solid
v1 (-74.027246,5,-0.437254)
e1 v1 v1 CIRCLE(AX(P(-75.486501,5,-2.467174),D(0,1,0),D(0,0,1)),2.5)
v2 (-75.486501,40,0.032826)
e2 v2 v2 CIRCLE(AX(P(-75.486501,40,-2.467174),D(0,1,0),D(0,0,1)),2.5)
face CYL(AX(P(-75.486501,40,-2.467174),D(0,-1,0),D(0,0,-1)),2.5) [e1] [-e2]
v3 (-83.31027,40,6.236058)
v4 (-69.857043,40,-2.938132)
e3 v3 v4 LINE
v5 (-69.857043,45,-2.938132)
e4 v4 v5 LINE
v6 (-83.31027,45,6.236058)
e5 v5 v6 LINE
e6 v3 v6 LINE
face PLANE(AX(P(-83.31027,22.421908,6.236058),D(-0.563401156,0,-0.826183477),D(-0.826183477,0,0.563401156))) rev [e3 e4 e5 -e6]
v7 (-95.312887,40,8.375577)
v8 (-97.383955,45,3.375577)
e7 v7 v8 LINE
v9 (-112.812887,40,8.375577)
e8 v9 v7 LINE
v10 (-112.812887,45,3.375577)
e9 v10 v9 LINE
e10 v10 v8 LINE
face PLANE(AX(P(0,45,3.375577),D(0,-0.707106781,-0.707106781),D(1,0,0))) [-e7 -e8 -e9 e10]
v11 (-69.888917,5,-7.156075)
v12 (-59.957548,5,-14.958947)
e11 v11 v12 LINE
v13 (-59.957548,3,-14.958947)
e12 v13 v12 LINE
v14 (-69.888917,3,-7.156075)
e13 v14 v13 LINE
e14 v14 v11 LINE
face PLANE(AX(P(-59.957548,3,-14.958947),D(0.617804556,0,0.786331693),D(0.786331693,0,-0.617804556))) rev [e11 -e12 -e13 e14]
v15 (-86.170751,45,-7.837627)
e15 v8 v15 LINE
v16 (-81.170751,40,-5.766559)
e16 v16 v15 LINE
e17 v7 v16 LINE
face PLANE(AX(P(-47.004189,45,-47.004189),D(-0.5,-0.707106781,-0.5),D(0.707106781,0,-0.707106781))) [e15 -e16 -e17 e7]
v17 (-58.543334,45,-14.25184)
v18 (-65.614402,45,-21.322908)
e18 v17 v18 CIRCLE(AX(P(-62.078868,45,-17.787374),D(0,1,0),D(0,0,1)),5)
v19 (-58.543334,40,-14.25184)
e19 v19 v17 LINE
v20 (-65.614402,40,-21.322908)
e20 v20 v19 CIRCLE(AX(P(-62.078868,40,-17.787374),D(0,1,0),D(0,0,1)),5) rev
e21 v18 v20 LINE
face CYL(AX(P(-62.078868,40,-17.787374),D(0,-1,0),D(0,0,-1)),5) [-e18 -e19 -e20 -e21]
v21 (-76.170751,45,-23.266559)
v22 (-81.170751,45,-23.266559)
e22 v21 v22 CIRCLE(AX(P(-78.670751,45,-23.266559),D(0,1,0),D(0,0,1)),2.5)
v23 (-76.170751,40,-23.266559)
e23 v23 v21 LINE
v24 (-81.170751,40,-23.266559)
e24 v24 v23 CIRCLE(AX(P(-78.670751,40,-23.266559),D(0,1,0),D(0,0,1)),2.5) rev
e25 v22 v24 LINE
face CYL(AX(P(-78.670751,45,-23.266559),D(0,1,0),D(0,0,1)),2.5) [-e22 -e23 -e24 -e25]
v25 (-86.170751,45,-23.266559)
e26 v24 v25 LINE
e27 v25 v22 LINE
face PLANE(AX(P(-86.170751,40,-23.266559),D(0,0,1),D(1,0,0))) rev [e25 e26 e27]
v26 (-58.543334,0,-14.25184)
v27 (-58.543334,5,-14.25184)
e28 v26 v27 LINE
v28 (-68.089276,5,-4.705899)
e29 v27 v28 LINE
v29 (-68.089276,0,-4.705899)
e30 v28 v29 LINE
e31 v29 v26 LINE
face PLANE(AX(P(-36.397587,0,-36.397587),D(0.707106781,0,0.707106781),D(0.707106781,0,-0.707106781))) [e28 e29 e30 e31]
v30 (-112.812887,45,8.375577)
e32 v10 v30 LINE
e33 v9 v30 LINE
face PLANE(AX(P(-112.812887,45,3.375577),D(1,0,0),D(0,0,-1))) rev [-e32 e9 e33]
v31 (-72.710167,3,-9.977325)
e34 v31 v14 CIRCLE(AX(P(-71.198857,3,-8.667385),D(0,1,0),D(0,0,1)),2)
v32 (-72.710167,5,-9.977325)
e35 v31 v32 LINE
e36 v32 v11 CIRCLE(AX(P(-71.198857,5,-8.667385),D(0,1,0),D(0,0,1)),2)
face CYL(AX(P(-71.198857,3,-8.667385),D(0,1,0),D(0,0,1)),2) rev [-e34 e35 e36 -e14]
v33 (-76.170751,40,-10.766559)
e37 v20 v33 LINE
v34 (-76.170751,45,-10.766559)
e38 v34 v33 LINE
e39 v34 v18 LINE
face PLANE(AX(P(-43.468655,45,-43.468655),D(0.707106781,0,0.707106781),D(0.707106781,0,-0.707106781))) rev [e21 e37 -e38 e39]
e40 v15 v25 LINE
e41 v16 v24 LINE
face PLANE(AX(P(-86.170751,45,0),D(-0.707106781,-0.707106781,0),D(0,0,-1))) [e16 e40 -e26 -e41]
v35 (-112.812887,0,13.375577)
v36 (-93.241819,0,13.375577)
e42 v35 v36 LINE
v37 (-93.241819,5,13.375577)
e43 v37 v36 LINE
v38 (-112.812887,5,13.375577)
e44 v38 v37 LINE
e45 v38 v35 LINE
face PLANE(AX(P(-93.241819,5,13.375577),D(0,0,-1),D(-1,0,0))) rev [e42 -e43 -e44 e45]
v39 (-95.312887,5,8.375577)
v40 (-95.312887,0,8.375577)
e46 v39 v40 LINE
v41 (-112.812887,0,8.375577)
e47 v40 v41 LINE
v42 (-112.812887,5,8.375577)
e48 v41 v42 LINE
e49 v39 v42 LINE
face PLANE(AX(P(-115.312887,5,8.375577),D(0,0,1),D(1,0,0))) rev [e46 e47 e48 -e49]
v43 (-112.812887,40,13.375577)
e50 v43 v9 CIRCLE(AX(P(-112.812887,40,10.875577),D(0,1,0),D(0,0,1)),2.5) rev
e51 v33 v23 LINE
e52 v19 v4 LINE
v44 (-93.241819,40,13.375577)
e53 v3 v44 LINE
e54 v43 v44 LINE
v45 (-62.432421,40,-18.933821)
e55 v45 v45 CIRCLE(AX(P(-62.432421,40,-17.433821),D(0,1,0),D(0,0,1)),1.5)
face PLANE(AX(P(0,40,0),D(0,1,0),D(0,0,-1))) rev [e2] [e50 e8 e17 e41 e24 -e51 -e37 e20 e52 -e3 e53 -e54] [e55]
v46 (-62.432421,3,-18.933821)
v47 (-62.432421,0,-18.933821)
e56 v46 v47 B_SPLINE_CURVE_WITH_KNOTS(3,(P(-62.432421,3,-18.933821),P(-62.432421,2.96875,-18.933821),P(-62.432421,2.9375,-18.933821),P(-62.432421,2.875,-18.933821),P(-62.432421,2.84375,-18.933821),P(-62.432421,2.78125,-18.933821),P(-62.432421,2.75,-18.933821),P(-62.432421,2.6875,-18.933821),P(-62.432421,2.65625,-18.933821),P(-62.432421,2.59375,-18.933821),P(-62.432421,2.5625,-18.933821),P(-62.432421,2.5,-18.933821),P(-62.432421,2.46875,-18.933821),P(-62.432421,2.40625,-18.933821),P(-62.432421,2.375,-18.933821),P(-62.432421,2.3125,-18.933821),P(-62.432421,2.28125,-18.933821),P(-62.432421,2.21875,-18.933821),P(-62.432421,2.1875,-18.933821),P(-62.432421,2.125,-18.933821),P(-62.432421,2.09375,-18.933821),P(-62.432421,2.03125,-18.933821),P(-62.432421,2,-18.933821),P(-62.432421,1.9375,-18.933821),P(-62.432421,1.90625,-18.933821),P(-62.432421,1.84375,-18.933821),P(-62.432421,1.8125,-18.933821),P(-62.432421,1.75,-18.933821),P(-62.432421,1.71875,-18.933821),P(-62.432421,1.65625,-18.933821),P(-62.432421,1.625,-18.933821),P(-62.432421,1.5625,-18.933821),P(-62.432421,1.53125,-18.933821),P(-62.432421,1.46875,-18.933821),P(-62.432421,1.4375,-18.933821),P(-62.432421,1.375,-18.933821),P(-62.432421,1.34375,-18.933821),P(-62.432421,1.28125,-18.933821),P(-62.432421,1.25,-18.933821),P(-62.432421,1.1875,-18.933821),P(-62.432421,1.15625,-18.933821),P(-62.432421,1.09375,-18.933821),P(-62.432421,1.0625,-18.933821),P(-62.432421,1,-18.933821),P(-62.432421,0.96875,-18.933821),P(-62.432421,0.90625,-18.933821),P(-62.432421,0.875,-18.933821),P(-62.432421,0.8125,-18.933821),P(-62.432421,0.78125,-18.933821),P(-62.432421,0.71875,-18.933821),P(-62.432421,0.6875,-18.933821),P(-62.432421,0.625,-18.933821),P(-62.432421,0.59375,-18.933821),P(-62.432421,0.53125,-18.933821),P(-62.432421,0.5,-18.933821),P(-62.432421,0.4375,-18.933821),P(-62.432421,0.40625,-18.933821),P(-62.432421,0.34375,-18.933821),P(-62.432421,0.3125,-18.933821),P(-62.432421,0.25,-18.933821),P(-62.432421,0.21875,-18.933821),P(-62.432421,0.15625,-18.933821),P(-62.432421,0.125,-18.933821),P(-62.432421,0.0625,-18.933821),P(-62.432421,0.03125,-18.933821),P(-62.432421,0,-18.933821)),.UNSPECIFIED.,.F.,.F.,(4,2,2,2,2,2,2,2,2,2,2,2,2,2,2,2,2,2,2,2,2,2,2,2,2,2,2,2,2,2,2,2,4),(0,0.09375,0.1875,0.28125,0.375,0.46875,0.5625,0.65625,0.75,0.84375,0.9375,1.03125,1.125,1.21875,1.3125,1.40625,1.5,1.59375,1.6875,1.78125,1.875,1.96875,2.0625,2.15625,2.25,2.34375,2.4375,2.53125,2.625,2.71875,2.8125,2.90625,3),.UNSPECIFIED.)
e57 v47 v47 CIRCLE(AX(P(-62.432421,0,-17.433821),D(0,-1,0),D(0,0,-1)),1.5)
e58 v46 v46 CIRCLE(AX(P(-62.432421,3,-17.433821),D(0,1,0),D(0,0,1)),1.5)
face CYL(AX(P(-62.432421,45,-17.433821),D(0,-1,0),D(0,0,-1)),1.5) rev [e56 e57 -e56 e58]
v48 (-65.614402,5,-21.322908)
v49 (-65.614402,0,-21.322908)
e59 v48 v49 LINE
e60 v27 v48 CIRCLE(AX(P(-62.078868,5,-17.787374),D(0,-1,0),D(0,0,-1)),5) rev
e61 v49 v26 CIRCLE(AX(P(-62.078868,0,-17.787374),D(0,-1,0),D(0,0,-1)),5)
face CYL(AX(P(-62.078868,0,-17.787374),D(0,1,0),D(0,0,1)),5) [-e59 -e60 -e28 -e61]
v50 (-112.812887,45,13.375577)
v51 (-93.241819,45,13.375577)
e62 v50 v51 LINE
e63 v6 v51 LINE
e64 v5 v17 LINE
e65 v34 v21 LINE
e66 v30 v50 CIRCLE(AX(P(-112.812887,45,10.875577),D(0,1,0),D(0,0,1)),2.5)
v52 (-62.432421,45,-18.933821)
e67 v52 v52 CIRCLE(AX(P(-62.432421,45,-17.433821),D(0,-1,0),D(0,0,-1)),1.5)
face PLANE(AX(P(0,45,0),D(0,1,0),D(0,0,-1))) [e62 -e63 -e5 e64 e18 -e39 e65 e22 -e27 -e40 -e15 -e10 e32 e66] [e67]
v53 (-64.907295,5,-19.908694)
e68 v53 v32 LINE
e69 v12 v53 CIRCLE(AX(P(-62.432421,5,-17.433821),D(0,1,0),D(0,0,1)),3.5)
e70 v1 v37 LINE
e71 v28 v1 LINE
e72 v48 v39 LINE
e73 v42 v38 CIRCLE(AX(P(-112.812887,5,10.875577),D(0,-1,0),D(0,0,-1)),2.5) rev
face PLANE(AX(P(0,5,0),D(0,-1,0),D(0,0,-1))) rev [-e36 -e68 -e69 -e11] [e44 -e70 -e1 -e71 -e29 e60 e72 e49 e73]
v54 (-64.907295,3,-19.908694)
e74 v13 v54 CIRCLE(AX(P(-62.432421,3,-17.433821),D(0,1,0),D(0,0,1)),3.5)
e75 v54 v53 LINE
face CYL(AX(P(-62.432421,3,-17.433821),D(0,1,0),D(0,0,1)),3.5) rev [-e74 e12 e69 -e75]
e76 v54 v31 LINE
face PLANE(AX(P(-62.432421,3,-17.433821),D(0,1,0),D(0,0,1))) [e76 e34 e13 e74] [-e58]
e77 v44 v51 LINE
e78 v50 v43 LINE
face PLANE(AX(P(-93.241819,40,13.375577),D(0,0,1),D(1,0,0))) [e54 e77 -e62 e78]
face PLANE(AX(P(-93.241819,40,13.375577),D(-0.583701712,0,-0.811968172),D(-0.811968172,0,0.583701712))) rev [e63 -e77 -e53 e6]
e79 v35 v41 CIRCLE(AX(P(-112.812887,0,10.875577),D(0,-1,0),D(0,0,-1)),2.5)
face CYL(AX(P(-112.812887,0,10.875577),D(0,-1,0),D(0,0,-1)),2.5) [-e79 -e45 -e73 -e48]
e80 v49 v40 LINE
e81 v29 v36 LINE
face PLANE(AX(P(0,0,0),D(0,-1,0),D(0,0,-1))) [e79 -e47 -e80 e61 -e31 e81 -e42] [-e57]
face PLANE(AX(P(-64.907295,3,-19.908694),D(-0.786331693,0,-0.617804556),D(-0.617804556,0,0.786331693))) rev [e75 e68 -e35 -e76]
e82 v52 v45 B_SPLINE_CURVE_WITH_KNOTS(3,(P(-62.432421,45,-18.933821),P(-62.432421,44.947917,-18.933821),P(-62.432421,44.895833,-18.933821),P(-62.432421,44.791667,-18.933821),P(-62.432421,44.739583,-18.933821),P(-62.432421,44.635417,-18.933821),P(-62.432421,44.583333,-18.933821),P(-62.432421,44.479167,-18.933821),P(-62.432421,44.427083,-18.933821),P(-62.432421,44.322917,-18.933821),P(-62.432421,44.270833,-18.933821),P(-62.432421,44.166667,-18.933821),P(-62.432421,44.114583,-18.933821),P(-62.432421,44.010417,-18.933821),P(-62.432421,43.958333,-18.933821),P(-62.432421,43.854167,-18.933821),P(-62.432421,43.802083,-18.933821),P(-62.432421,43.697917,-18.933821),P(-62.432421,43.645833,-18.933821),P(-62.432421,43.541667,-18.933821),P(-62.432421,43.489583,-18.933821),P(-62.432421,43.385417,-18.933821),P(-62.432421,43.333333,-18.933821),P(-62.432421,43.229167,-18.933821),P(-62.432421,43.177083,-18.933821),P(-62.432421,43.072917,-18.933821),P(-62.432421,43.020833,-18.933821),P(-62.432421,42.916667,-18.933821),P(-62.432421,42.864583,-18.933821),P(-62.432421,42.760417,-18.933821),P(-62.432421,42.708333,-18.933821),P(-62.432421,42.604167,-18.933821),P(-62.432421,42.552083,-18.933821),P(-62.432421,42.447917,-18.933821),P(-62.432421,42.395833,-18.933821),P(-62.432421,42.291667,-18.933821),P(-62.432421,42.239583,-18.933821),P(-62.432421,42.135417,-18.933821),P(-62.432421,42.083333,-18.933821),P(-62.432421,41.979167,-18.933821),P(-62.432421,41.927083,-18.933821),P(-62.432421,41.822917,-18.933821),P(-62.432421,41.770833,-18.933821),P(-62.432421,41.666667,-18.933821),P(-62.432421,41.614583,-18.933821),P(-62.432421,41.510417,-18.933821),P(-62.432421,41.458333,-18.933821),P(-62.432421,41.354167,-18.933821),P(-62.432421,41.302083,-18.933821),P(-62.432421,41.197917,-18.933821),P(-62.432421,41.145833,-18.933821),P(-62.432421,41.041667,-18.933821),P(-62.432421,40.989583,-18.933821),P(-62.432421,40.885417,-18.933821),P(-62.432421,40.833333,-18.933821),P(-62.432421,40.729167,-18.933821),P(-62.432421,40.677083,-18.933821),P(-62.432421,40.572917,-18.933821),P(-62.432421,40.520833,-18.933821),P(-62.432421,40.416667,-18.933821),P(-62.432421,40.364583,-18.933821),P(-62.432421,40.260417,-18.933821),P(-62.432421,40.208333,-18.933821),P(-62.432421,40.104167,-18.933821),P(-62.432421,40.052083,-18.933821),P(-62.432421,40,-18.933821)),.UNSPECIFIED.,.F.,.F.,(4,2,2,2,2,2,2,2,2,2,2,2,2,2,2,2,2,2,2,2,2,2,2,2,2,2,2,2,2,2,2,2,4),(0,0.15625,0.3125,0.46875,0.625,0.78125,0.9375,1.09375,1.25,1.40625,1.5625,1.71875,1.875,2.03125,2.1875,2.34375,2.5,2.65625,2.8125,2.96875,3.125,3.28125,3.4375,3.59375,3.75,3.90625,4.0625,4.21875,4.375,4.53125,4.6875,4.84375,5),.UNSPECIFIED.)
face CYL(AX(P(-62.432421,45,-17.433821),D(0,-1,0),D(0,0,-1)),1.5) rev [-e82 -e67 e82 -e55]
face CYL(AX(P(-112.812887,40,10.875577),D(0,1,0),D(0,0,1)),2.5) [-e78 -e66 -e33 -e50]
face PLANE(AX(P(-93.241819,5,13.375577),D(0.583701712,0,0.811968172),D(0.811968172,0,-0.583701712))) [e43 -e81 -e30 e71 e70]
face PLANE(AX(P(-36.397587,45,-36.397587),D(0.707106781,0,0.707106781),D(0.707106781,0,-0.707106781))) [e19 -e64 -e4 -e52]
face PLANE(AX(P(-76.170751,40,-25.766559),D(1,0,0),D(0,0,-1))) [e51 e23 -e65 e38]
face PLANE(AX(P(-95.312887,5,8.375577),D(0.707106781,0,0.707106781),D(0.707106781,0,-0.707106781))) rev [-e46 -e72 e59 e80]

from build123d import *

# Parameters (mm, degrees)
AUFSATZ_LINEAR_AUSTRAGEN1_DEPTH  = 5
VERRUNDUNG1_RADIUS               = 2.5
VERRUNDUNG1_LENGTH               = 5
SKIZZE6_W                        = 37
SKIZZE6_H                        = 5
AUFSATZ_LINEAR_AUSTRAGEN3_DEPTH  = 5
SCHNITT_LINEAR_AUSTRAGEN3_DEPTH  = 5
AUFSATZ_LINEAR_AUSTRAGEN6_DEPTH  = 5
SCHNITT_LINEAR_AUSTRAGEN2_DEPTH  = 2
VERRUNDUNG8_RADIUS               = 2.5
VERRUNDUNG8_LENGTH               = 5
VERRUNDUNG9_RADIUS               = 5
VERRUNDUNG9_LENGTH               = 5
SKIZZE37_R                       = 2.5
AUFSATZ_LINEAR_AUSTRAGEN11_DEPTH = 35
SPIEGELN19_START                 = 40
SPIEGELN19_DEPTH                 = 5
SCHNITT_LINEAR_AUSTRAGEN4_DEPTH  = 5
SKIZZE39_W                       = 20
SKIZZE39_H                       = 5
AUFSATZ_LINEAR_AUSTRAGEN12_DEPTH = 5
SKIZZE40_W                       = 17.5
SKIZZE40_H                       = 5
AUFSATZ_LINEAR_AUSTRAGEN14_DEPTH = 5
SKIZZE41_W                       = 17.5
SKIZZE41_H                       = 5
AUFSATZ_LINEAR_AUSTRAGEN15_DEPTH = 5
FASE10_SIZE                      = 5
SKIZZE42_R                       = 1.5
SCHNITT_LINEAR_AUSTRAGEN6_DEPTH  = 127.435665063
SCHNITT_LINEAR_AUSTRAGEN7_DEPTH  = 5


# Read off the part's stored shape, not the designer's step: Spiegeln19
with BuildPart() as part:
    # Skizze2 → Aufsatz-Linear austragen1 (new body)
    with BuildSketch(Plane(origin=(0, 0, 0), x_dir=(1, 0, 0), z_dir=(0, 1, 0))):
        Polygon((-81.170751107, 25.766558824), (-76.170751107, 25.766558824), (-76.170751107, 3.695491012), (-93.241818919, -13.3755768), (-115.312886731, -13.3755768), (-115.312886731, -8.3755768), (-95.312886731, -8.3755768), (-81.170751107, 5.766558824), align=None)
    extrude(amount=AUFSATZ_LINEAR_AUSTRAGEN1_DEPTH)

    # Verrundung1: full round fillet: the end face becomes a half cylinder, R = half its width
    verrundung1_face = Plane((-115.312886731, 2.5, 10.8755768), x_dir=(0, 1, 0), z_dir=(-1, 0, 0))  # on the end face: x along it, z out of the body
    verrundung1_slab = verrundung1_face.offset(-VERRUNDUNG1_RADIUS / 2) * Box(VERRUNDUNG1_LENGTH, 2 * VERRUNDUNG1_RADIUS, VERRUNDUNG1_RADIUS, mode=Mode.PRIVATE)  # the body's end, R deep
    verrundung1_round = Plane((-112.812886731, 2.5, 10.8755768), x_dir=(-1, 0, 0), z_dir=(0, 1, 0)) * Cylinder(VERRUNDUNG1_RADIUS, VERRUNDUNG1_LENGTH, mode=Mode.PRIVATE)  # its axis R under the face
    add(verrundung1_slab - verrundung1_round, mode=Mode.SUBTRACT)

    # Skizze6 → Aufsatz-Linear austragen3 (add, symmetric)
    with BuildSketch(Plane(origin=(-39.933121059, 0, -39.933121059), x_dir=(0.7071067811865485, 0, -0.7071067811865467), z_dir=(0.7071067811865467, 0, 0.7071067811865485))):
        with Locations((-44.818815693, 2.5)):
            Rectangle(SKIZZE6_W, SKIZZE6_H)
    extrude(amount=AUFSATZ_LINEAR_AUSTRAGEN3_DEPTH, both=True)

    # Skizze10 → Schnitt-Linear austragen3 (cut)
    with BuildSketch(Plane.XZ):
        Polygon((-84.706285013, 4.840042894), (-68.089275655, -4.705898652), (-81.170751107, 8.3755768), align=None)
    extrude(amount=-SCHNITT_LINEAR_AUSTRAGEN3_DEPTH, mode=Mode.SUBTRACT)

    # Skizze15 → Aufsatz-Linear austragen6 (add)
    with BuildSketch(Plane.XZ):
        Polygon((-93.241818919, 13.3755768), (-68.089275655, -4.705898652), (-84.706285013, 4.840042894), align=None)
    extrude(amount=-AUFSATZ_LINEAR_AUSTRAGEN6_DEPTH)

    # Skizze9 → Schnitt-Linear austragen2 (cut)
    with BuildSketch(Plane(origin=(0, 5, 0), x_dir=(1, 0, 0), z_dir=(0, 1, 0))):
        with BuildLine():
            Line((-64.90729514, 19.908694448), (-72.710166677, 9.977325168))
            ThreePointArc((-72.710166677, 9.977325168), (-72.613070241, 7.253171877), (-69.888916951, 7.156075442))
            Line((-69.888916951, 7.156075442), (-59.957547671, 14.958946979))
            ThreePointArc((-59.957547671, 14.958946979), (-59.957547671, 19.908694448), (-64.90729514, 19.908694448))
        make_face()
    extrude(amount=-SCHNITT_LINEAR_AUSTRAGEN2_DEPTH, mode=Mode.SUBTRACT)

    # Verrundung8: full round fillet: the end face becomes a half cylinder, R = half its width
    verrundung8_face = Plane((-78.670751107, 2.5, -25.766558824), x_dir=(0, 1, 0), z_dir=(0, 0, -1))  # on the end face: x along it, z out of the body
    verrundung8_slab = verrundung8_face.offset(-VERRUNDUNG8_RADIUS / 2) * Box(VERRUNDUNG8_LENGTH, 2 * VERRUNDUNG8_RADIUS, VERRUNDUNG8_RADIUS, mode=Mode.PRIVATE)  # the body's end, R deep
    verrundung8_round = Plane((-78.670751107, 2.5, -23.266558824), x_dir=(0, 0, -1), z_dir=(0, 1, 0)) * Cylinder(VERRUNDUNG8_RADIUS, VERRUNDUNG8_LENGTH, mode=Mode.PRIVATE)  # its axis R under the face
    add(verrundung8_slab - verrundung8_round, mode=Mode.SUBTRACT)

    # Verrundung9: full round fillet: the end face becomes a half cylinder, R = half its width
    verrundung9_face = Plane((-58.543334109, 2.5, -21.32290801), x_dir=(0, 1, 0), z_dir=(0.707106781187, 0, -0.707106781187))  # on the end face: x along it, z out of the body
    verrundung9_slab = verrundung9_face.offset(-VERRUNDUNG9_RADIUS / 2) * Box(VERRUNDUNG9_LENGTH, 2 * VERRUNDUNG9_RADIUS, VERRUNDUNG9_RADIUS, mode=Mode.PRIVATE)  # the body's end, R deep
    verrundung9_round = Plane((-62.078868015, 2.5, -17.787374104), x_dir=(0.707106781187, 0, -0.707106781187), z_dir=(0, 1, 0)) * Cylinder(VERRUNDUNG9_RADIUS, VERRUNDUNG9_LENGTH, mode=Mode.PRIVATE)  # its axis R under the face
    add(verrundung9_slab - verrundung9_round, mode=Mode.SUBTRACT)

    # Skizze37 → Aufsatz-Linear austragen11 (add)
    with BuildSketch(Plane(origin=(0, 5, 0), x_dir=(1, 0, 0), z_dir=(0, 1, 0))):
        with Locations(Location((-75.486500657, 2.467174327, 0), (0, 0, 305.711324765))):
            Circle(SKIZZE37_R)
    extrude(amount=AUFSATZ_LINEAR_AUSTRAGEN11_DEPTH)

    # Spiegeln19 outline → Spiegeln19 (add)
    with BuildSketch(Plane(origin=(0, 0, 0), x_dir=(1, 0, 0), z_dir=(0, 1, 0)).offset(SPIEGELN19_START)):
        with BuildLine():
            ThreePointArc((-58.543334109, 14.251840198), (-58.543334109, 21.32290801), (-65.614401921, 21.32290801))
            Line((-65.614401921, 21.32290801), (-76.170751107, 10.766558824))
            Line((-76.170751107, 10.766558824), (-76.170751107, 23.266558824))
            ThreePointArc((-76.170751107, 23.266558824), (-78.670751107, 25.766558824), (-81.170751107, 23.266558824))
            Line((-81.170751107, 23.266558824), (-81.170751107, 5.766558824))
            Line((-81.170751107, 5.766558824), (-95.312886731, -8.3755768))
            Line((-95.312886731, -8.3755768), (-112.812886731, -8.3755768))
            ThreePointArc((-112.812886731, -8.3755768), (-115.312886731, -10.8755768), (-112.812886731, -13.3755768))
            Line((-112.812886731, -13.3755768), (-93.241818919, -13.3755768))
            Line((-93.241818919, -13.3755768), (-83.310270003, -6.236057904))
            Line((-83.310270003, -6.236057904), (-81.170751107, -8.3755768))
            Line((-81.170751107, -8.3755768), (-58.543334109, 14.251840198))
        make_face()
    extrude(amount=SPIEGELN19_DEPTH)

    # Skizze38 → Schnitt-Linear austragen4 (cut)
    with BuildSketch(Plane(origin=(0, 45, 0), x_dir=(1, 0, 0), z_dir=(0, 1, 0))):
        Polygon((-83.310270003, -6.236057904), (-69.857042608, 2.938131699), (-81.170751107, -8.3755768), align=None)
    extrude(amount=-SCHNITT_LINEAR_AUSTRAGEN4_DEPTH, mode=Mode.SUBTRACT)

    # Skizze39 → Aufsatz-Linear austragen12 (add)
    with BuildSketch(Plane(origin=(-43.468654965, 0, -43.468654965), x_dir=(-0.7071067811865486, 0, 0.7071067811865465), z_dir=(-0.7071067811865465, 0, -0.7071067811865486))):
        with Locations((63.318815693, 42.5)):
            Rectangle(SKIZZE39_W, SKIZZE39_H)
    extrude(amount=AUFSATZ_LINEAR_AUSTRAGEN12_DEPTH)

    # Skizze40 → Aufsatz-Linear austragen14 (add)
    with BuildSketch(Plane.ZY.offset(81.170751107)):
        with Locations((-14.516558824, 42.5)):
            Rectangle(SKIZZE40_W, SKIZZE40_H)
    extrude(amount=AUFSATZ_LINEAR_AUSTRAGEN14_DEPTH)

    # Skizze41 → Aufsatz-Linear austragen15 (add)
    with BuildSketch(Plane(origin=(0, 0, 8.3755768), x_dir=(-1, 0, 0), z_dir=(0, 0, -1))):
        with Locations((104.062886731, 42.5)):
            Rectangle(SKIZZE41_W, SKIZZE41_H)
    extrude(amount=AUFSATZ_LINEAR_AUSTRAGEN15_DEPTH)

    # Fase10
    fase10_edges = [part.edges().sort_by_distance(p)[0] for p in [
        (-86.170751107, 40, -15.55209273),
        (-91.777352825, 40, -2.231024918),
        (-105.098420637, 40, 3.3755768),
    ]]
    chamfer(fase10_edges, length=FASE10_SIZE - 0.0001)  # a hair under: the kernel refuses the full size

    # Skizze42 → Schnitt-Linear austragen6 (cut, through all)
    with BuildSketch(Plane.XZ):
        with Locations(Location((-62.432421405, -17.433820713, 0), (0, 0, 270))):
            Circle(SKIZZE42_R)
    extrude(amount=-SCHNITT_LINEAR_AUSTRAGEN6_DEPTH, mode=Mode.SUBTRACT)

    # Skizze43 → Schnitt-Linear austragen7 (cut)
    with BuildSketch(Plane(origin=(0, 0, 0), x_dir=(-1, 0, 0), z_dir=(0, -1, 0))):
        Polygon((81.170751107, 5.766558824), (76.170751107, 10.766558824), (76.170751107, 25.766558824), (81.170751107, 25.766558824), align=None)
    extrude(amount=-SCHNITT_LINEAR_AUSTRAGEN7_DEPTH, mode=Mode.SUBTRACT)


solid = part.part
